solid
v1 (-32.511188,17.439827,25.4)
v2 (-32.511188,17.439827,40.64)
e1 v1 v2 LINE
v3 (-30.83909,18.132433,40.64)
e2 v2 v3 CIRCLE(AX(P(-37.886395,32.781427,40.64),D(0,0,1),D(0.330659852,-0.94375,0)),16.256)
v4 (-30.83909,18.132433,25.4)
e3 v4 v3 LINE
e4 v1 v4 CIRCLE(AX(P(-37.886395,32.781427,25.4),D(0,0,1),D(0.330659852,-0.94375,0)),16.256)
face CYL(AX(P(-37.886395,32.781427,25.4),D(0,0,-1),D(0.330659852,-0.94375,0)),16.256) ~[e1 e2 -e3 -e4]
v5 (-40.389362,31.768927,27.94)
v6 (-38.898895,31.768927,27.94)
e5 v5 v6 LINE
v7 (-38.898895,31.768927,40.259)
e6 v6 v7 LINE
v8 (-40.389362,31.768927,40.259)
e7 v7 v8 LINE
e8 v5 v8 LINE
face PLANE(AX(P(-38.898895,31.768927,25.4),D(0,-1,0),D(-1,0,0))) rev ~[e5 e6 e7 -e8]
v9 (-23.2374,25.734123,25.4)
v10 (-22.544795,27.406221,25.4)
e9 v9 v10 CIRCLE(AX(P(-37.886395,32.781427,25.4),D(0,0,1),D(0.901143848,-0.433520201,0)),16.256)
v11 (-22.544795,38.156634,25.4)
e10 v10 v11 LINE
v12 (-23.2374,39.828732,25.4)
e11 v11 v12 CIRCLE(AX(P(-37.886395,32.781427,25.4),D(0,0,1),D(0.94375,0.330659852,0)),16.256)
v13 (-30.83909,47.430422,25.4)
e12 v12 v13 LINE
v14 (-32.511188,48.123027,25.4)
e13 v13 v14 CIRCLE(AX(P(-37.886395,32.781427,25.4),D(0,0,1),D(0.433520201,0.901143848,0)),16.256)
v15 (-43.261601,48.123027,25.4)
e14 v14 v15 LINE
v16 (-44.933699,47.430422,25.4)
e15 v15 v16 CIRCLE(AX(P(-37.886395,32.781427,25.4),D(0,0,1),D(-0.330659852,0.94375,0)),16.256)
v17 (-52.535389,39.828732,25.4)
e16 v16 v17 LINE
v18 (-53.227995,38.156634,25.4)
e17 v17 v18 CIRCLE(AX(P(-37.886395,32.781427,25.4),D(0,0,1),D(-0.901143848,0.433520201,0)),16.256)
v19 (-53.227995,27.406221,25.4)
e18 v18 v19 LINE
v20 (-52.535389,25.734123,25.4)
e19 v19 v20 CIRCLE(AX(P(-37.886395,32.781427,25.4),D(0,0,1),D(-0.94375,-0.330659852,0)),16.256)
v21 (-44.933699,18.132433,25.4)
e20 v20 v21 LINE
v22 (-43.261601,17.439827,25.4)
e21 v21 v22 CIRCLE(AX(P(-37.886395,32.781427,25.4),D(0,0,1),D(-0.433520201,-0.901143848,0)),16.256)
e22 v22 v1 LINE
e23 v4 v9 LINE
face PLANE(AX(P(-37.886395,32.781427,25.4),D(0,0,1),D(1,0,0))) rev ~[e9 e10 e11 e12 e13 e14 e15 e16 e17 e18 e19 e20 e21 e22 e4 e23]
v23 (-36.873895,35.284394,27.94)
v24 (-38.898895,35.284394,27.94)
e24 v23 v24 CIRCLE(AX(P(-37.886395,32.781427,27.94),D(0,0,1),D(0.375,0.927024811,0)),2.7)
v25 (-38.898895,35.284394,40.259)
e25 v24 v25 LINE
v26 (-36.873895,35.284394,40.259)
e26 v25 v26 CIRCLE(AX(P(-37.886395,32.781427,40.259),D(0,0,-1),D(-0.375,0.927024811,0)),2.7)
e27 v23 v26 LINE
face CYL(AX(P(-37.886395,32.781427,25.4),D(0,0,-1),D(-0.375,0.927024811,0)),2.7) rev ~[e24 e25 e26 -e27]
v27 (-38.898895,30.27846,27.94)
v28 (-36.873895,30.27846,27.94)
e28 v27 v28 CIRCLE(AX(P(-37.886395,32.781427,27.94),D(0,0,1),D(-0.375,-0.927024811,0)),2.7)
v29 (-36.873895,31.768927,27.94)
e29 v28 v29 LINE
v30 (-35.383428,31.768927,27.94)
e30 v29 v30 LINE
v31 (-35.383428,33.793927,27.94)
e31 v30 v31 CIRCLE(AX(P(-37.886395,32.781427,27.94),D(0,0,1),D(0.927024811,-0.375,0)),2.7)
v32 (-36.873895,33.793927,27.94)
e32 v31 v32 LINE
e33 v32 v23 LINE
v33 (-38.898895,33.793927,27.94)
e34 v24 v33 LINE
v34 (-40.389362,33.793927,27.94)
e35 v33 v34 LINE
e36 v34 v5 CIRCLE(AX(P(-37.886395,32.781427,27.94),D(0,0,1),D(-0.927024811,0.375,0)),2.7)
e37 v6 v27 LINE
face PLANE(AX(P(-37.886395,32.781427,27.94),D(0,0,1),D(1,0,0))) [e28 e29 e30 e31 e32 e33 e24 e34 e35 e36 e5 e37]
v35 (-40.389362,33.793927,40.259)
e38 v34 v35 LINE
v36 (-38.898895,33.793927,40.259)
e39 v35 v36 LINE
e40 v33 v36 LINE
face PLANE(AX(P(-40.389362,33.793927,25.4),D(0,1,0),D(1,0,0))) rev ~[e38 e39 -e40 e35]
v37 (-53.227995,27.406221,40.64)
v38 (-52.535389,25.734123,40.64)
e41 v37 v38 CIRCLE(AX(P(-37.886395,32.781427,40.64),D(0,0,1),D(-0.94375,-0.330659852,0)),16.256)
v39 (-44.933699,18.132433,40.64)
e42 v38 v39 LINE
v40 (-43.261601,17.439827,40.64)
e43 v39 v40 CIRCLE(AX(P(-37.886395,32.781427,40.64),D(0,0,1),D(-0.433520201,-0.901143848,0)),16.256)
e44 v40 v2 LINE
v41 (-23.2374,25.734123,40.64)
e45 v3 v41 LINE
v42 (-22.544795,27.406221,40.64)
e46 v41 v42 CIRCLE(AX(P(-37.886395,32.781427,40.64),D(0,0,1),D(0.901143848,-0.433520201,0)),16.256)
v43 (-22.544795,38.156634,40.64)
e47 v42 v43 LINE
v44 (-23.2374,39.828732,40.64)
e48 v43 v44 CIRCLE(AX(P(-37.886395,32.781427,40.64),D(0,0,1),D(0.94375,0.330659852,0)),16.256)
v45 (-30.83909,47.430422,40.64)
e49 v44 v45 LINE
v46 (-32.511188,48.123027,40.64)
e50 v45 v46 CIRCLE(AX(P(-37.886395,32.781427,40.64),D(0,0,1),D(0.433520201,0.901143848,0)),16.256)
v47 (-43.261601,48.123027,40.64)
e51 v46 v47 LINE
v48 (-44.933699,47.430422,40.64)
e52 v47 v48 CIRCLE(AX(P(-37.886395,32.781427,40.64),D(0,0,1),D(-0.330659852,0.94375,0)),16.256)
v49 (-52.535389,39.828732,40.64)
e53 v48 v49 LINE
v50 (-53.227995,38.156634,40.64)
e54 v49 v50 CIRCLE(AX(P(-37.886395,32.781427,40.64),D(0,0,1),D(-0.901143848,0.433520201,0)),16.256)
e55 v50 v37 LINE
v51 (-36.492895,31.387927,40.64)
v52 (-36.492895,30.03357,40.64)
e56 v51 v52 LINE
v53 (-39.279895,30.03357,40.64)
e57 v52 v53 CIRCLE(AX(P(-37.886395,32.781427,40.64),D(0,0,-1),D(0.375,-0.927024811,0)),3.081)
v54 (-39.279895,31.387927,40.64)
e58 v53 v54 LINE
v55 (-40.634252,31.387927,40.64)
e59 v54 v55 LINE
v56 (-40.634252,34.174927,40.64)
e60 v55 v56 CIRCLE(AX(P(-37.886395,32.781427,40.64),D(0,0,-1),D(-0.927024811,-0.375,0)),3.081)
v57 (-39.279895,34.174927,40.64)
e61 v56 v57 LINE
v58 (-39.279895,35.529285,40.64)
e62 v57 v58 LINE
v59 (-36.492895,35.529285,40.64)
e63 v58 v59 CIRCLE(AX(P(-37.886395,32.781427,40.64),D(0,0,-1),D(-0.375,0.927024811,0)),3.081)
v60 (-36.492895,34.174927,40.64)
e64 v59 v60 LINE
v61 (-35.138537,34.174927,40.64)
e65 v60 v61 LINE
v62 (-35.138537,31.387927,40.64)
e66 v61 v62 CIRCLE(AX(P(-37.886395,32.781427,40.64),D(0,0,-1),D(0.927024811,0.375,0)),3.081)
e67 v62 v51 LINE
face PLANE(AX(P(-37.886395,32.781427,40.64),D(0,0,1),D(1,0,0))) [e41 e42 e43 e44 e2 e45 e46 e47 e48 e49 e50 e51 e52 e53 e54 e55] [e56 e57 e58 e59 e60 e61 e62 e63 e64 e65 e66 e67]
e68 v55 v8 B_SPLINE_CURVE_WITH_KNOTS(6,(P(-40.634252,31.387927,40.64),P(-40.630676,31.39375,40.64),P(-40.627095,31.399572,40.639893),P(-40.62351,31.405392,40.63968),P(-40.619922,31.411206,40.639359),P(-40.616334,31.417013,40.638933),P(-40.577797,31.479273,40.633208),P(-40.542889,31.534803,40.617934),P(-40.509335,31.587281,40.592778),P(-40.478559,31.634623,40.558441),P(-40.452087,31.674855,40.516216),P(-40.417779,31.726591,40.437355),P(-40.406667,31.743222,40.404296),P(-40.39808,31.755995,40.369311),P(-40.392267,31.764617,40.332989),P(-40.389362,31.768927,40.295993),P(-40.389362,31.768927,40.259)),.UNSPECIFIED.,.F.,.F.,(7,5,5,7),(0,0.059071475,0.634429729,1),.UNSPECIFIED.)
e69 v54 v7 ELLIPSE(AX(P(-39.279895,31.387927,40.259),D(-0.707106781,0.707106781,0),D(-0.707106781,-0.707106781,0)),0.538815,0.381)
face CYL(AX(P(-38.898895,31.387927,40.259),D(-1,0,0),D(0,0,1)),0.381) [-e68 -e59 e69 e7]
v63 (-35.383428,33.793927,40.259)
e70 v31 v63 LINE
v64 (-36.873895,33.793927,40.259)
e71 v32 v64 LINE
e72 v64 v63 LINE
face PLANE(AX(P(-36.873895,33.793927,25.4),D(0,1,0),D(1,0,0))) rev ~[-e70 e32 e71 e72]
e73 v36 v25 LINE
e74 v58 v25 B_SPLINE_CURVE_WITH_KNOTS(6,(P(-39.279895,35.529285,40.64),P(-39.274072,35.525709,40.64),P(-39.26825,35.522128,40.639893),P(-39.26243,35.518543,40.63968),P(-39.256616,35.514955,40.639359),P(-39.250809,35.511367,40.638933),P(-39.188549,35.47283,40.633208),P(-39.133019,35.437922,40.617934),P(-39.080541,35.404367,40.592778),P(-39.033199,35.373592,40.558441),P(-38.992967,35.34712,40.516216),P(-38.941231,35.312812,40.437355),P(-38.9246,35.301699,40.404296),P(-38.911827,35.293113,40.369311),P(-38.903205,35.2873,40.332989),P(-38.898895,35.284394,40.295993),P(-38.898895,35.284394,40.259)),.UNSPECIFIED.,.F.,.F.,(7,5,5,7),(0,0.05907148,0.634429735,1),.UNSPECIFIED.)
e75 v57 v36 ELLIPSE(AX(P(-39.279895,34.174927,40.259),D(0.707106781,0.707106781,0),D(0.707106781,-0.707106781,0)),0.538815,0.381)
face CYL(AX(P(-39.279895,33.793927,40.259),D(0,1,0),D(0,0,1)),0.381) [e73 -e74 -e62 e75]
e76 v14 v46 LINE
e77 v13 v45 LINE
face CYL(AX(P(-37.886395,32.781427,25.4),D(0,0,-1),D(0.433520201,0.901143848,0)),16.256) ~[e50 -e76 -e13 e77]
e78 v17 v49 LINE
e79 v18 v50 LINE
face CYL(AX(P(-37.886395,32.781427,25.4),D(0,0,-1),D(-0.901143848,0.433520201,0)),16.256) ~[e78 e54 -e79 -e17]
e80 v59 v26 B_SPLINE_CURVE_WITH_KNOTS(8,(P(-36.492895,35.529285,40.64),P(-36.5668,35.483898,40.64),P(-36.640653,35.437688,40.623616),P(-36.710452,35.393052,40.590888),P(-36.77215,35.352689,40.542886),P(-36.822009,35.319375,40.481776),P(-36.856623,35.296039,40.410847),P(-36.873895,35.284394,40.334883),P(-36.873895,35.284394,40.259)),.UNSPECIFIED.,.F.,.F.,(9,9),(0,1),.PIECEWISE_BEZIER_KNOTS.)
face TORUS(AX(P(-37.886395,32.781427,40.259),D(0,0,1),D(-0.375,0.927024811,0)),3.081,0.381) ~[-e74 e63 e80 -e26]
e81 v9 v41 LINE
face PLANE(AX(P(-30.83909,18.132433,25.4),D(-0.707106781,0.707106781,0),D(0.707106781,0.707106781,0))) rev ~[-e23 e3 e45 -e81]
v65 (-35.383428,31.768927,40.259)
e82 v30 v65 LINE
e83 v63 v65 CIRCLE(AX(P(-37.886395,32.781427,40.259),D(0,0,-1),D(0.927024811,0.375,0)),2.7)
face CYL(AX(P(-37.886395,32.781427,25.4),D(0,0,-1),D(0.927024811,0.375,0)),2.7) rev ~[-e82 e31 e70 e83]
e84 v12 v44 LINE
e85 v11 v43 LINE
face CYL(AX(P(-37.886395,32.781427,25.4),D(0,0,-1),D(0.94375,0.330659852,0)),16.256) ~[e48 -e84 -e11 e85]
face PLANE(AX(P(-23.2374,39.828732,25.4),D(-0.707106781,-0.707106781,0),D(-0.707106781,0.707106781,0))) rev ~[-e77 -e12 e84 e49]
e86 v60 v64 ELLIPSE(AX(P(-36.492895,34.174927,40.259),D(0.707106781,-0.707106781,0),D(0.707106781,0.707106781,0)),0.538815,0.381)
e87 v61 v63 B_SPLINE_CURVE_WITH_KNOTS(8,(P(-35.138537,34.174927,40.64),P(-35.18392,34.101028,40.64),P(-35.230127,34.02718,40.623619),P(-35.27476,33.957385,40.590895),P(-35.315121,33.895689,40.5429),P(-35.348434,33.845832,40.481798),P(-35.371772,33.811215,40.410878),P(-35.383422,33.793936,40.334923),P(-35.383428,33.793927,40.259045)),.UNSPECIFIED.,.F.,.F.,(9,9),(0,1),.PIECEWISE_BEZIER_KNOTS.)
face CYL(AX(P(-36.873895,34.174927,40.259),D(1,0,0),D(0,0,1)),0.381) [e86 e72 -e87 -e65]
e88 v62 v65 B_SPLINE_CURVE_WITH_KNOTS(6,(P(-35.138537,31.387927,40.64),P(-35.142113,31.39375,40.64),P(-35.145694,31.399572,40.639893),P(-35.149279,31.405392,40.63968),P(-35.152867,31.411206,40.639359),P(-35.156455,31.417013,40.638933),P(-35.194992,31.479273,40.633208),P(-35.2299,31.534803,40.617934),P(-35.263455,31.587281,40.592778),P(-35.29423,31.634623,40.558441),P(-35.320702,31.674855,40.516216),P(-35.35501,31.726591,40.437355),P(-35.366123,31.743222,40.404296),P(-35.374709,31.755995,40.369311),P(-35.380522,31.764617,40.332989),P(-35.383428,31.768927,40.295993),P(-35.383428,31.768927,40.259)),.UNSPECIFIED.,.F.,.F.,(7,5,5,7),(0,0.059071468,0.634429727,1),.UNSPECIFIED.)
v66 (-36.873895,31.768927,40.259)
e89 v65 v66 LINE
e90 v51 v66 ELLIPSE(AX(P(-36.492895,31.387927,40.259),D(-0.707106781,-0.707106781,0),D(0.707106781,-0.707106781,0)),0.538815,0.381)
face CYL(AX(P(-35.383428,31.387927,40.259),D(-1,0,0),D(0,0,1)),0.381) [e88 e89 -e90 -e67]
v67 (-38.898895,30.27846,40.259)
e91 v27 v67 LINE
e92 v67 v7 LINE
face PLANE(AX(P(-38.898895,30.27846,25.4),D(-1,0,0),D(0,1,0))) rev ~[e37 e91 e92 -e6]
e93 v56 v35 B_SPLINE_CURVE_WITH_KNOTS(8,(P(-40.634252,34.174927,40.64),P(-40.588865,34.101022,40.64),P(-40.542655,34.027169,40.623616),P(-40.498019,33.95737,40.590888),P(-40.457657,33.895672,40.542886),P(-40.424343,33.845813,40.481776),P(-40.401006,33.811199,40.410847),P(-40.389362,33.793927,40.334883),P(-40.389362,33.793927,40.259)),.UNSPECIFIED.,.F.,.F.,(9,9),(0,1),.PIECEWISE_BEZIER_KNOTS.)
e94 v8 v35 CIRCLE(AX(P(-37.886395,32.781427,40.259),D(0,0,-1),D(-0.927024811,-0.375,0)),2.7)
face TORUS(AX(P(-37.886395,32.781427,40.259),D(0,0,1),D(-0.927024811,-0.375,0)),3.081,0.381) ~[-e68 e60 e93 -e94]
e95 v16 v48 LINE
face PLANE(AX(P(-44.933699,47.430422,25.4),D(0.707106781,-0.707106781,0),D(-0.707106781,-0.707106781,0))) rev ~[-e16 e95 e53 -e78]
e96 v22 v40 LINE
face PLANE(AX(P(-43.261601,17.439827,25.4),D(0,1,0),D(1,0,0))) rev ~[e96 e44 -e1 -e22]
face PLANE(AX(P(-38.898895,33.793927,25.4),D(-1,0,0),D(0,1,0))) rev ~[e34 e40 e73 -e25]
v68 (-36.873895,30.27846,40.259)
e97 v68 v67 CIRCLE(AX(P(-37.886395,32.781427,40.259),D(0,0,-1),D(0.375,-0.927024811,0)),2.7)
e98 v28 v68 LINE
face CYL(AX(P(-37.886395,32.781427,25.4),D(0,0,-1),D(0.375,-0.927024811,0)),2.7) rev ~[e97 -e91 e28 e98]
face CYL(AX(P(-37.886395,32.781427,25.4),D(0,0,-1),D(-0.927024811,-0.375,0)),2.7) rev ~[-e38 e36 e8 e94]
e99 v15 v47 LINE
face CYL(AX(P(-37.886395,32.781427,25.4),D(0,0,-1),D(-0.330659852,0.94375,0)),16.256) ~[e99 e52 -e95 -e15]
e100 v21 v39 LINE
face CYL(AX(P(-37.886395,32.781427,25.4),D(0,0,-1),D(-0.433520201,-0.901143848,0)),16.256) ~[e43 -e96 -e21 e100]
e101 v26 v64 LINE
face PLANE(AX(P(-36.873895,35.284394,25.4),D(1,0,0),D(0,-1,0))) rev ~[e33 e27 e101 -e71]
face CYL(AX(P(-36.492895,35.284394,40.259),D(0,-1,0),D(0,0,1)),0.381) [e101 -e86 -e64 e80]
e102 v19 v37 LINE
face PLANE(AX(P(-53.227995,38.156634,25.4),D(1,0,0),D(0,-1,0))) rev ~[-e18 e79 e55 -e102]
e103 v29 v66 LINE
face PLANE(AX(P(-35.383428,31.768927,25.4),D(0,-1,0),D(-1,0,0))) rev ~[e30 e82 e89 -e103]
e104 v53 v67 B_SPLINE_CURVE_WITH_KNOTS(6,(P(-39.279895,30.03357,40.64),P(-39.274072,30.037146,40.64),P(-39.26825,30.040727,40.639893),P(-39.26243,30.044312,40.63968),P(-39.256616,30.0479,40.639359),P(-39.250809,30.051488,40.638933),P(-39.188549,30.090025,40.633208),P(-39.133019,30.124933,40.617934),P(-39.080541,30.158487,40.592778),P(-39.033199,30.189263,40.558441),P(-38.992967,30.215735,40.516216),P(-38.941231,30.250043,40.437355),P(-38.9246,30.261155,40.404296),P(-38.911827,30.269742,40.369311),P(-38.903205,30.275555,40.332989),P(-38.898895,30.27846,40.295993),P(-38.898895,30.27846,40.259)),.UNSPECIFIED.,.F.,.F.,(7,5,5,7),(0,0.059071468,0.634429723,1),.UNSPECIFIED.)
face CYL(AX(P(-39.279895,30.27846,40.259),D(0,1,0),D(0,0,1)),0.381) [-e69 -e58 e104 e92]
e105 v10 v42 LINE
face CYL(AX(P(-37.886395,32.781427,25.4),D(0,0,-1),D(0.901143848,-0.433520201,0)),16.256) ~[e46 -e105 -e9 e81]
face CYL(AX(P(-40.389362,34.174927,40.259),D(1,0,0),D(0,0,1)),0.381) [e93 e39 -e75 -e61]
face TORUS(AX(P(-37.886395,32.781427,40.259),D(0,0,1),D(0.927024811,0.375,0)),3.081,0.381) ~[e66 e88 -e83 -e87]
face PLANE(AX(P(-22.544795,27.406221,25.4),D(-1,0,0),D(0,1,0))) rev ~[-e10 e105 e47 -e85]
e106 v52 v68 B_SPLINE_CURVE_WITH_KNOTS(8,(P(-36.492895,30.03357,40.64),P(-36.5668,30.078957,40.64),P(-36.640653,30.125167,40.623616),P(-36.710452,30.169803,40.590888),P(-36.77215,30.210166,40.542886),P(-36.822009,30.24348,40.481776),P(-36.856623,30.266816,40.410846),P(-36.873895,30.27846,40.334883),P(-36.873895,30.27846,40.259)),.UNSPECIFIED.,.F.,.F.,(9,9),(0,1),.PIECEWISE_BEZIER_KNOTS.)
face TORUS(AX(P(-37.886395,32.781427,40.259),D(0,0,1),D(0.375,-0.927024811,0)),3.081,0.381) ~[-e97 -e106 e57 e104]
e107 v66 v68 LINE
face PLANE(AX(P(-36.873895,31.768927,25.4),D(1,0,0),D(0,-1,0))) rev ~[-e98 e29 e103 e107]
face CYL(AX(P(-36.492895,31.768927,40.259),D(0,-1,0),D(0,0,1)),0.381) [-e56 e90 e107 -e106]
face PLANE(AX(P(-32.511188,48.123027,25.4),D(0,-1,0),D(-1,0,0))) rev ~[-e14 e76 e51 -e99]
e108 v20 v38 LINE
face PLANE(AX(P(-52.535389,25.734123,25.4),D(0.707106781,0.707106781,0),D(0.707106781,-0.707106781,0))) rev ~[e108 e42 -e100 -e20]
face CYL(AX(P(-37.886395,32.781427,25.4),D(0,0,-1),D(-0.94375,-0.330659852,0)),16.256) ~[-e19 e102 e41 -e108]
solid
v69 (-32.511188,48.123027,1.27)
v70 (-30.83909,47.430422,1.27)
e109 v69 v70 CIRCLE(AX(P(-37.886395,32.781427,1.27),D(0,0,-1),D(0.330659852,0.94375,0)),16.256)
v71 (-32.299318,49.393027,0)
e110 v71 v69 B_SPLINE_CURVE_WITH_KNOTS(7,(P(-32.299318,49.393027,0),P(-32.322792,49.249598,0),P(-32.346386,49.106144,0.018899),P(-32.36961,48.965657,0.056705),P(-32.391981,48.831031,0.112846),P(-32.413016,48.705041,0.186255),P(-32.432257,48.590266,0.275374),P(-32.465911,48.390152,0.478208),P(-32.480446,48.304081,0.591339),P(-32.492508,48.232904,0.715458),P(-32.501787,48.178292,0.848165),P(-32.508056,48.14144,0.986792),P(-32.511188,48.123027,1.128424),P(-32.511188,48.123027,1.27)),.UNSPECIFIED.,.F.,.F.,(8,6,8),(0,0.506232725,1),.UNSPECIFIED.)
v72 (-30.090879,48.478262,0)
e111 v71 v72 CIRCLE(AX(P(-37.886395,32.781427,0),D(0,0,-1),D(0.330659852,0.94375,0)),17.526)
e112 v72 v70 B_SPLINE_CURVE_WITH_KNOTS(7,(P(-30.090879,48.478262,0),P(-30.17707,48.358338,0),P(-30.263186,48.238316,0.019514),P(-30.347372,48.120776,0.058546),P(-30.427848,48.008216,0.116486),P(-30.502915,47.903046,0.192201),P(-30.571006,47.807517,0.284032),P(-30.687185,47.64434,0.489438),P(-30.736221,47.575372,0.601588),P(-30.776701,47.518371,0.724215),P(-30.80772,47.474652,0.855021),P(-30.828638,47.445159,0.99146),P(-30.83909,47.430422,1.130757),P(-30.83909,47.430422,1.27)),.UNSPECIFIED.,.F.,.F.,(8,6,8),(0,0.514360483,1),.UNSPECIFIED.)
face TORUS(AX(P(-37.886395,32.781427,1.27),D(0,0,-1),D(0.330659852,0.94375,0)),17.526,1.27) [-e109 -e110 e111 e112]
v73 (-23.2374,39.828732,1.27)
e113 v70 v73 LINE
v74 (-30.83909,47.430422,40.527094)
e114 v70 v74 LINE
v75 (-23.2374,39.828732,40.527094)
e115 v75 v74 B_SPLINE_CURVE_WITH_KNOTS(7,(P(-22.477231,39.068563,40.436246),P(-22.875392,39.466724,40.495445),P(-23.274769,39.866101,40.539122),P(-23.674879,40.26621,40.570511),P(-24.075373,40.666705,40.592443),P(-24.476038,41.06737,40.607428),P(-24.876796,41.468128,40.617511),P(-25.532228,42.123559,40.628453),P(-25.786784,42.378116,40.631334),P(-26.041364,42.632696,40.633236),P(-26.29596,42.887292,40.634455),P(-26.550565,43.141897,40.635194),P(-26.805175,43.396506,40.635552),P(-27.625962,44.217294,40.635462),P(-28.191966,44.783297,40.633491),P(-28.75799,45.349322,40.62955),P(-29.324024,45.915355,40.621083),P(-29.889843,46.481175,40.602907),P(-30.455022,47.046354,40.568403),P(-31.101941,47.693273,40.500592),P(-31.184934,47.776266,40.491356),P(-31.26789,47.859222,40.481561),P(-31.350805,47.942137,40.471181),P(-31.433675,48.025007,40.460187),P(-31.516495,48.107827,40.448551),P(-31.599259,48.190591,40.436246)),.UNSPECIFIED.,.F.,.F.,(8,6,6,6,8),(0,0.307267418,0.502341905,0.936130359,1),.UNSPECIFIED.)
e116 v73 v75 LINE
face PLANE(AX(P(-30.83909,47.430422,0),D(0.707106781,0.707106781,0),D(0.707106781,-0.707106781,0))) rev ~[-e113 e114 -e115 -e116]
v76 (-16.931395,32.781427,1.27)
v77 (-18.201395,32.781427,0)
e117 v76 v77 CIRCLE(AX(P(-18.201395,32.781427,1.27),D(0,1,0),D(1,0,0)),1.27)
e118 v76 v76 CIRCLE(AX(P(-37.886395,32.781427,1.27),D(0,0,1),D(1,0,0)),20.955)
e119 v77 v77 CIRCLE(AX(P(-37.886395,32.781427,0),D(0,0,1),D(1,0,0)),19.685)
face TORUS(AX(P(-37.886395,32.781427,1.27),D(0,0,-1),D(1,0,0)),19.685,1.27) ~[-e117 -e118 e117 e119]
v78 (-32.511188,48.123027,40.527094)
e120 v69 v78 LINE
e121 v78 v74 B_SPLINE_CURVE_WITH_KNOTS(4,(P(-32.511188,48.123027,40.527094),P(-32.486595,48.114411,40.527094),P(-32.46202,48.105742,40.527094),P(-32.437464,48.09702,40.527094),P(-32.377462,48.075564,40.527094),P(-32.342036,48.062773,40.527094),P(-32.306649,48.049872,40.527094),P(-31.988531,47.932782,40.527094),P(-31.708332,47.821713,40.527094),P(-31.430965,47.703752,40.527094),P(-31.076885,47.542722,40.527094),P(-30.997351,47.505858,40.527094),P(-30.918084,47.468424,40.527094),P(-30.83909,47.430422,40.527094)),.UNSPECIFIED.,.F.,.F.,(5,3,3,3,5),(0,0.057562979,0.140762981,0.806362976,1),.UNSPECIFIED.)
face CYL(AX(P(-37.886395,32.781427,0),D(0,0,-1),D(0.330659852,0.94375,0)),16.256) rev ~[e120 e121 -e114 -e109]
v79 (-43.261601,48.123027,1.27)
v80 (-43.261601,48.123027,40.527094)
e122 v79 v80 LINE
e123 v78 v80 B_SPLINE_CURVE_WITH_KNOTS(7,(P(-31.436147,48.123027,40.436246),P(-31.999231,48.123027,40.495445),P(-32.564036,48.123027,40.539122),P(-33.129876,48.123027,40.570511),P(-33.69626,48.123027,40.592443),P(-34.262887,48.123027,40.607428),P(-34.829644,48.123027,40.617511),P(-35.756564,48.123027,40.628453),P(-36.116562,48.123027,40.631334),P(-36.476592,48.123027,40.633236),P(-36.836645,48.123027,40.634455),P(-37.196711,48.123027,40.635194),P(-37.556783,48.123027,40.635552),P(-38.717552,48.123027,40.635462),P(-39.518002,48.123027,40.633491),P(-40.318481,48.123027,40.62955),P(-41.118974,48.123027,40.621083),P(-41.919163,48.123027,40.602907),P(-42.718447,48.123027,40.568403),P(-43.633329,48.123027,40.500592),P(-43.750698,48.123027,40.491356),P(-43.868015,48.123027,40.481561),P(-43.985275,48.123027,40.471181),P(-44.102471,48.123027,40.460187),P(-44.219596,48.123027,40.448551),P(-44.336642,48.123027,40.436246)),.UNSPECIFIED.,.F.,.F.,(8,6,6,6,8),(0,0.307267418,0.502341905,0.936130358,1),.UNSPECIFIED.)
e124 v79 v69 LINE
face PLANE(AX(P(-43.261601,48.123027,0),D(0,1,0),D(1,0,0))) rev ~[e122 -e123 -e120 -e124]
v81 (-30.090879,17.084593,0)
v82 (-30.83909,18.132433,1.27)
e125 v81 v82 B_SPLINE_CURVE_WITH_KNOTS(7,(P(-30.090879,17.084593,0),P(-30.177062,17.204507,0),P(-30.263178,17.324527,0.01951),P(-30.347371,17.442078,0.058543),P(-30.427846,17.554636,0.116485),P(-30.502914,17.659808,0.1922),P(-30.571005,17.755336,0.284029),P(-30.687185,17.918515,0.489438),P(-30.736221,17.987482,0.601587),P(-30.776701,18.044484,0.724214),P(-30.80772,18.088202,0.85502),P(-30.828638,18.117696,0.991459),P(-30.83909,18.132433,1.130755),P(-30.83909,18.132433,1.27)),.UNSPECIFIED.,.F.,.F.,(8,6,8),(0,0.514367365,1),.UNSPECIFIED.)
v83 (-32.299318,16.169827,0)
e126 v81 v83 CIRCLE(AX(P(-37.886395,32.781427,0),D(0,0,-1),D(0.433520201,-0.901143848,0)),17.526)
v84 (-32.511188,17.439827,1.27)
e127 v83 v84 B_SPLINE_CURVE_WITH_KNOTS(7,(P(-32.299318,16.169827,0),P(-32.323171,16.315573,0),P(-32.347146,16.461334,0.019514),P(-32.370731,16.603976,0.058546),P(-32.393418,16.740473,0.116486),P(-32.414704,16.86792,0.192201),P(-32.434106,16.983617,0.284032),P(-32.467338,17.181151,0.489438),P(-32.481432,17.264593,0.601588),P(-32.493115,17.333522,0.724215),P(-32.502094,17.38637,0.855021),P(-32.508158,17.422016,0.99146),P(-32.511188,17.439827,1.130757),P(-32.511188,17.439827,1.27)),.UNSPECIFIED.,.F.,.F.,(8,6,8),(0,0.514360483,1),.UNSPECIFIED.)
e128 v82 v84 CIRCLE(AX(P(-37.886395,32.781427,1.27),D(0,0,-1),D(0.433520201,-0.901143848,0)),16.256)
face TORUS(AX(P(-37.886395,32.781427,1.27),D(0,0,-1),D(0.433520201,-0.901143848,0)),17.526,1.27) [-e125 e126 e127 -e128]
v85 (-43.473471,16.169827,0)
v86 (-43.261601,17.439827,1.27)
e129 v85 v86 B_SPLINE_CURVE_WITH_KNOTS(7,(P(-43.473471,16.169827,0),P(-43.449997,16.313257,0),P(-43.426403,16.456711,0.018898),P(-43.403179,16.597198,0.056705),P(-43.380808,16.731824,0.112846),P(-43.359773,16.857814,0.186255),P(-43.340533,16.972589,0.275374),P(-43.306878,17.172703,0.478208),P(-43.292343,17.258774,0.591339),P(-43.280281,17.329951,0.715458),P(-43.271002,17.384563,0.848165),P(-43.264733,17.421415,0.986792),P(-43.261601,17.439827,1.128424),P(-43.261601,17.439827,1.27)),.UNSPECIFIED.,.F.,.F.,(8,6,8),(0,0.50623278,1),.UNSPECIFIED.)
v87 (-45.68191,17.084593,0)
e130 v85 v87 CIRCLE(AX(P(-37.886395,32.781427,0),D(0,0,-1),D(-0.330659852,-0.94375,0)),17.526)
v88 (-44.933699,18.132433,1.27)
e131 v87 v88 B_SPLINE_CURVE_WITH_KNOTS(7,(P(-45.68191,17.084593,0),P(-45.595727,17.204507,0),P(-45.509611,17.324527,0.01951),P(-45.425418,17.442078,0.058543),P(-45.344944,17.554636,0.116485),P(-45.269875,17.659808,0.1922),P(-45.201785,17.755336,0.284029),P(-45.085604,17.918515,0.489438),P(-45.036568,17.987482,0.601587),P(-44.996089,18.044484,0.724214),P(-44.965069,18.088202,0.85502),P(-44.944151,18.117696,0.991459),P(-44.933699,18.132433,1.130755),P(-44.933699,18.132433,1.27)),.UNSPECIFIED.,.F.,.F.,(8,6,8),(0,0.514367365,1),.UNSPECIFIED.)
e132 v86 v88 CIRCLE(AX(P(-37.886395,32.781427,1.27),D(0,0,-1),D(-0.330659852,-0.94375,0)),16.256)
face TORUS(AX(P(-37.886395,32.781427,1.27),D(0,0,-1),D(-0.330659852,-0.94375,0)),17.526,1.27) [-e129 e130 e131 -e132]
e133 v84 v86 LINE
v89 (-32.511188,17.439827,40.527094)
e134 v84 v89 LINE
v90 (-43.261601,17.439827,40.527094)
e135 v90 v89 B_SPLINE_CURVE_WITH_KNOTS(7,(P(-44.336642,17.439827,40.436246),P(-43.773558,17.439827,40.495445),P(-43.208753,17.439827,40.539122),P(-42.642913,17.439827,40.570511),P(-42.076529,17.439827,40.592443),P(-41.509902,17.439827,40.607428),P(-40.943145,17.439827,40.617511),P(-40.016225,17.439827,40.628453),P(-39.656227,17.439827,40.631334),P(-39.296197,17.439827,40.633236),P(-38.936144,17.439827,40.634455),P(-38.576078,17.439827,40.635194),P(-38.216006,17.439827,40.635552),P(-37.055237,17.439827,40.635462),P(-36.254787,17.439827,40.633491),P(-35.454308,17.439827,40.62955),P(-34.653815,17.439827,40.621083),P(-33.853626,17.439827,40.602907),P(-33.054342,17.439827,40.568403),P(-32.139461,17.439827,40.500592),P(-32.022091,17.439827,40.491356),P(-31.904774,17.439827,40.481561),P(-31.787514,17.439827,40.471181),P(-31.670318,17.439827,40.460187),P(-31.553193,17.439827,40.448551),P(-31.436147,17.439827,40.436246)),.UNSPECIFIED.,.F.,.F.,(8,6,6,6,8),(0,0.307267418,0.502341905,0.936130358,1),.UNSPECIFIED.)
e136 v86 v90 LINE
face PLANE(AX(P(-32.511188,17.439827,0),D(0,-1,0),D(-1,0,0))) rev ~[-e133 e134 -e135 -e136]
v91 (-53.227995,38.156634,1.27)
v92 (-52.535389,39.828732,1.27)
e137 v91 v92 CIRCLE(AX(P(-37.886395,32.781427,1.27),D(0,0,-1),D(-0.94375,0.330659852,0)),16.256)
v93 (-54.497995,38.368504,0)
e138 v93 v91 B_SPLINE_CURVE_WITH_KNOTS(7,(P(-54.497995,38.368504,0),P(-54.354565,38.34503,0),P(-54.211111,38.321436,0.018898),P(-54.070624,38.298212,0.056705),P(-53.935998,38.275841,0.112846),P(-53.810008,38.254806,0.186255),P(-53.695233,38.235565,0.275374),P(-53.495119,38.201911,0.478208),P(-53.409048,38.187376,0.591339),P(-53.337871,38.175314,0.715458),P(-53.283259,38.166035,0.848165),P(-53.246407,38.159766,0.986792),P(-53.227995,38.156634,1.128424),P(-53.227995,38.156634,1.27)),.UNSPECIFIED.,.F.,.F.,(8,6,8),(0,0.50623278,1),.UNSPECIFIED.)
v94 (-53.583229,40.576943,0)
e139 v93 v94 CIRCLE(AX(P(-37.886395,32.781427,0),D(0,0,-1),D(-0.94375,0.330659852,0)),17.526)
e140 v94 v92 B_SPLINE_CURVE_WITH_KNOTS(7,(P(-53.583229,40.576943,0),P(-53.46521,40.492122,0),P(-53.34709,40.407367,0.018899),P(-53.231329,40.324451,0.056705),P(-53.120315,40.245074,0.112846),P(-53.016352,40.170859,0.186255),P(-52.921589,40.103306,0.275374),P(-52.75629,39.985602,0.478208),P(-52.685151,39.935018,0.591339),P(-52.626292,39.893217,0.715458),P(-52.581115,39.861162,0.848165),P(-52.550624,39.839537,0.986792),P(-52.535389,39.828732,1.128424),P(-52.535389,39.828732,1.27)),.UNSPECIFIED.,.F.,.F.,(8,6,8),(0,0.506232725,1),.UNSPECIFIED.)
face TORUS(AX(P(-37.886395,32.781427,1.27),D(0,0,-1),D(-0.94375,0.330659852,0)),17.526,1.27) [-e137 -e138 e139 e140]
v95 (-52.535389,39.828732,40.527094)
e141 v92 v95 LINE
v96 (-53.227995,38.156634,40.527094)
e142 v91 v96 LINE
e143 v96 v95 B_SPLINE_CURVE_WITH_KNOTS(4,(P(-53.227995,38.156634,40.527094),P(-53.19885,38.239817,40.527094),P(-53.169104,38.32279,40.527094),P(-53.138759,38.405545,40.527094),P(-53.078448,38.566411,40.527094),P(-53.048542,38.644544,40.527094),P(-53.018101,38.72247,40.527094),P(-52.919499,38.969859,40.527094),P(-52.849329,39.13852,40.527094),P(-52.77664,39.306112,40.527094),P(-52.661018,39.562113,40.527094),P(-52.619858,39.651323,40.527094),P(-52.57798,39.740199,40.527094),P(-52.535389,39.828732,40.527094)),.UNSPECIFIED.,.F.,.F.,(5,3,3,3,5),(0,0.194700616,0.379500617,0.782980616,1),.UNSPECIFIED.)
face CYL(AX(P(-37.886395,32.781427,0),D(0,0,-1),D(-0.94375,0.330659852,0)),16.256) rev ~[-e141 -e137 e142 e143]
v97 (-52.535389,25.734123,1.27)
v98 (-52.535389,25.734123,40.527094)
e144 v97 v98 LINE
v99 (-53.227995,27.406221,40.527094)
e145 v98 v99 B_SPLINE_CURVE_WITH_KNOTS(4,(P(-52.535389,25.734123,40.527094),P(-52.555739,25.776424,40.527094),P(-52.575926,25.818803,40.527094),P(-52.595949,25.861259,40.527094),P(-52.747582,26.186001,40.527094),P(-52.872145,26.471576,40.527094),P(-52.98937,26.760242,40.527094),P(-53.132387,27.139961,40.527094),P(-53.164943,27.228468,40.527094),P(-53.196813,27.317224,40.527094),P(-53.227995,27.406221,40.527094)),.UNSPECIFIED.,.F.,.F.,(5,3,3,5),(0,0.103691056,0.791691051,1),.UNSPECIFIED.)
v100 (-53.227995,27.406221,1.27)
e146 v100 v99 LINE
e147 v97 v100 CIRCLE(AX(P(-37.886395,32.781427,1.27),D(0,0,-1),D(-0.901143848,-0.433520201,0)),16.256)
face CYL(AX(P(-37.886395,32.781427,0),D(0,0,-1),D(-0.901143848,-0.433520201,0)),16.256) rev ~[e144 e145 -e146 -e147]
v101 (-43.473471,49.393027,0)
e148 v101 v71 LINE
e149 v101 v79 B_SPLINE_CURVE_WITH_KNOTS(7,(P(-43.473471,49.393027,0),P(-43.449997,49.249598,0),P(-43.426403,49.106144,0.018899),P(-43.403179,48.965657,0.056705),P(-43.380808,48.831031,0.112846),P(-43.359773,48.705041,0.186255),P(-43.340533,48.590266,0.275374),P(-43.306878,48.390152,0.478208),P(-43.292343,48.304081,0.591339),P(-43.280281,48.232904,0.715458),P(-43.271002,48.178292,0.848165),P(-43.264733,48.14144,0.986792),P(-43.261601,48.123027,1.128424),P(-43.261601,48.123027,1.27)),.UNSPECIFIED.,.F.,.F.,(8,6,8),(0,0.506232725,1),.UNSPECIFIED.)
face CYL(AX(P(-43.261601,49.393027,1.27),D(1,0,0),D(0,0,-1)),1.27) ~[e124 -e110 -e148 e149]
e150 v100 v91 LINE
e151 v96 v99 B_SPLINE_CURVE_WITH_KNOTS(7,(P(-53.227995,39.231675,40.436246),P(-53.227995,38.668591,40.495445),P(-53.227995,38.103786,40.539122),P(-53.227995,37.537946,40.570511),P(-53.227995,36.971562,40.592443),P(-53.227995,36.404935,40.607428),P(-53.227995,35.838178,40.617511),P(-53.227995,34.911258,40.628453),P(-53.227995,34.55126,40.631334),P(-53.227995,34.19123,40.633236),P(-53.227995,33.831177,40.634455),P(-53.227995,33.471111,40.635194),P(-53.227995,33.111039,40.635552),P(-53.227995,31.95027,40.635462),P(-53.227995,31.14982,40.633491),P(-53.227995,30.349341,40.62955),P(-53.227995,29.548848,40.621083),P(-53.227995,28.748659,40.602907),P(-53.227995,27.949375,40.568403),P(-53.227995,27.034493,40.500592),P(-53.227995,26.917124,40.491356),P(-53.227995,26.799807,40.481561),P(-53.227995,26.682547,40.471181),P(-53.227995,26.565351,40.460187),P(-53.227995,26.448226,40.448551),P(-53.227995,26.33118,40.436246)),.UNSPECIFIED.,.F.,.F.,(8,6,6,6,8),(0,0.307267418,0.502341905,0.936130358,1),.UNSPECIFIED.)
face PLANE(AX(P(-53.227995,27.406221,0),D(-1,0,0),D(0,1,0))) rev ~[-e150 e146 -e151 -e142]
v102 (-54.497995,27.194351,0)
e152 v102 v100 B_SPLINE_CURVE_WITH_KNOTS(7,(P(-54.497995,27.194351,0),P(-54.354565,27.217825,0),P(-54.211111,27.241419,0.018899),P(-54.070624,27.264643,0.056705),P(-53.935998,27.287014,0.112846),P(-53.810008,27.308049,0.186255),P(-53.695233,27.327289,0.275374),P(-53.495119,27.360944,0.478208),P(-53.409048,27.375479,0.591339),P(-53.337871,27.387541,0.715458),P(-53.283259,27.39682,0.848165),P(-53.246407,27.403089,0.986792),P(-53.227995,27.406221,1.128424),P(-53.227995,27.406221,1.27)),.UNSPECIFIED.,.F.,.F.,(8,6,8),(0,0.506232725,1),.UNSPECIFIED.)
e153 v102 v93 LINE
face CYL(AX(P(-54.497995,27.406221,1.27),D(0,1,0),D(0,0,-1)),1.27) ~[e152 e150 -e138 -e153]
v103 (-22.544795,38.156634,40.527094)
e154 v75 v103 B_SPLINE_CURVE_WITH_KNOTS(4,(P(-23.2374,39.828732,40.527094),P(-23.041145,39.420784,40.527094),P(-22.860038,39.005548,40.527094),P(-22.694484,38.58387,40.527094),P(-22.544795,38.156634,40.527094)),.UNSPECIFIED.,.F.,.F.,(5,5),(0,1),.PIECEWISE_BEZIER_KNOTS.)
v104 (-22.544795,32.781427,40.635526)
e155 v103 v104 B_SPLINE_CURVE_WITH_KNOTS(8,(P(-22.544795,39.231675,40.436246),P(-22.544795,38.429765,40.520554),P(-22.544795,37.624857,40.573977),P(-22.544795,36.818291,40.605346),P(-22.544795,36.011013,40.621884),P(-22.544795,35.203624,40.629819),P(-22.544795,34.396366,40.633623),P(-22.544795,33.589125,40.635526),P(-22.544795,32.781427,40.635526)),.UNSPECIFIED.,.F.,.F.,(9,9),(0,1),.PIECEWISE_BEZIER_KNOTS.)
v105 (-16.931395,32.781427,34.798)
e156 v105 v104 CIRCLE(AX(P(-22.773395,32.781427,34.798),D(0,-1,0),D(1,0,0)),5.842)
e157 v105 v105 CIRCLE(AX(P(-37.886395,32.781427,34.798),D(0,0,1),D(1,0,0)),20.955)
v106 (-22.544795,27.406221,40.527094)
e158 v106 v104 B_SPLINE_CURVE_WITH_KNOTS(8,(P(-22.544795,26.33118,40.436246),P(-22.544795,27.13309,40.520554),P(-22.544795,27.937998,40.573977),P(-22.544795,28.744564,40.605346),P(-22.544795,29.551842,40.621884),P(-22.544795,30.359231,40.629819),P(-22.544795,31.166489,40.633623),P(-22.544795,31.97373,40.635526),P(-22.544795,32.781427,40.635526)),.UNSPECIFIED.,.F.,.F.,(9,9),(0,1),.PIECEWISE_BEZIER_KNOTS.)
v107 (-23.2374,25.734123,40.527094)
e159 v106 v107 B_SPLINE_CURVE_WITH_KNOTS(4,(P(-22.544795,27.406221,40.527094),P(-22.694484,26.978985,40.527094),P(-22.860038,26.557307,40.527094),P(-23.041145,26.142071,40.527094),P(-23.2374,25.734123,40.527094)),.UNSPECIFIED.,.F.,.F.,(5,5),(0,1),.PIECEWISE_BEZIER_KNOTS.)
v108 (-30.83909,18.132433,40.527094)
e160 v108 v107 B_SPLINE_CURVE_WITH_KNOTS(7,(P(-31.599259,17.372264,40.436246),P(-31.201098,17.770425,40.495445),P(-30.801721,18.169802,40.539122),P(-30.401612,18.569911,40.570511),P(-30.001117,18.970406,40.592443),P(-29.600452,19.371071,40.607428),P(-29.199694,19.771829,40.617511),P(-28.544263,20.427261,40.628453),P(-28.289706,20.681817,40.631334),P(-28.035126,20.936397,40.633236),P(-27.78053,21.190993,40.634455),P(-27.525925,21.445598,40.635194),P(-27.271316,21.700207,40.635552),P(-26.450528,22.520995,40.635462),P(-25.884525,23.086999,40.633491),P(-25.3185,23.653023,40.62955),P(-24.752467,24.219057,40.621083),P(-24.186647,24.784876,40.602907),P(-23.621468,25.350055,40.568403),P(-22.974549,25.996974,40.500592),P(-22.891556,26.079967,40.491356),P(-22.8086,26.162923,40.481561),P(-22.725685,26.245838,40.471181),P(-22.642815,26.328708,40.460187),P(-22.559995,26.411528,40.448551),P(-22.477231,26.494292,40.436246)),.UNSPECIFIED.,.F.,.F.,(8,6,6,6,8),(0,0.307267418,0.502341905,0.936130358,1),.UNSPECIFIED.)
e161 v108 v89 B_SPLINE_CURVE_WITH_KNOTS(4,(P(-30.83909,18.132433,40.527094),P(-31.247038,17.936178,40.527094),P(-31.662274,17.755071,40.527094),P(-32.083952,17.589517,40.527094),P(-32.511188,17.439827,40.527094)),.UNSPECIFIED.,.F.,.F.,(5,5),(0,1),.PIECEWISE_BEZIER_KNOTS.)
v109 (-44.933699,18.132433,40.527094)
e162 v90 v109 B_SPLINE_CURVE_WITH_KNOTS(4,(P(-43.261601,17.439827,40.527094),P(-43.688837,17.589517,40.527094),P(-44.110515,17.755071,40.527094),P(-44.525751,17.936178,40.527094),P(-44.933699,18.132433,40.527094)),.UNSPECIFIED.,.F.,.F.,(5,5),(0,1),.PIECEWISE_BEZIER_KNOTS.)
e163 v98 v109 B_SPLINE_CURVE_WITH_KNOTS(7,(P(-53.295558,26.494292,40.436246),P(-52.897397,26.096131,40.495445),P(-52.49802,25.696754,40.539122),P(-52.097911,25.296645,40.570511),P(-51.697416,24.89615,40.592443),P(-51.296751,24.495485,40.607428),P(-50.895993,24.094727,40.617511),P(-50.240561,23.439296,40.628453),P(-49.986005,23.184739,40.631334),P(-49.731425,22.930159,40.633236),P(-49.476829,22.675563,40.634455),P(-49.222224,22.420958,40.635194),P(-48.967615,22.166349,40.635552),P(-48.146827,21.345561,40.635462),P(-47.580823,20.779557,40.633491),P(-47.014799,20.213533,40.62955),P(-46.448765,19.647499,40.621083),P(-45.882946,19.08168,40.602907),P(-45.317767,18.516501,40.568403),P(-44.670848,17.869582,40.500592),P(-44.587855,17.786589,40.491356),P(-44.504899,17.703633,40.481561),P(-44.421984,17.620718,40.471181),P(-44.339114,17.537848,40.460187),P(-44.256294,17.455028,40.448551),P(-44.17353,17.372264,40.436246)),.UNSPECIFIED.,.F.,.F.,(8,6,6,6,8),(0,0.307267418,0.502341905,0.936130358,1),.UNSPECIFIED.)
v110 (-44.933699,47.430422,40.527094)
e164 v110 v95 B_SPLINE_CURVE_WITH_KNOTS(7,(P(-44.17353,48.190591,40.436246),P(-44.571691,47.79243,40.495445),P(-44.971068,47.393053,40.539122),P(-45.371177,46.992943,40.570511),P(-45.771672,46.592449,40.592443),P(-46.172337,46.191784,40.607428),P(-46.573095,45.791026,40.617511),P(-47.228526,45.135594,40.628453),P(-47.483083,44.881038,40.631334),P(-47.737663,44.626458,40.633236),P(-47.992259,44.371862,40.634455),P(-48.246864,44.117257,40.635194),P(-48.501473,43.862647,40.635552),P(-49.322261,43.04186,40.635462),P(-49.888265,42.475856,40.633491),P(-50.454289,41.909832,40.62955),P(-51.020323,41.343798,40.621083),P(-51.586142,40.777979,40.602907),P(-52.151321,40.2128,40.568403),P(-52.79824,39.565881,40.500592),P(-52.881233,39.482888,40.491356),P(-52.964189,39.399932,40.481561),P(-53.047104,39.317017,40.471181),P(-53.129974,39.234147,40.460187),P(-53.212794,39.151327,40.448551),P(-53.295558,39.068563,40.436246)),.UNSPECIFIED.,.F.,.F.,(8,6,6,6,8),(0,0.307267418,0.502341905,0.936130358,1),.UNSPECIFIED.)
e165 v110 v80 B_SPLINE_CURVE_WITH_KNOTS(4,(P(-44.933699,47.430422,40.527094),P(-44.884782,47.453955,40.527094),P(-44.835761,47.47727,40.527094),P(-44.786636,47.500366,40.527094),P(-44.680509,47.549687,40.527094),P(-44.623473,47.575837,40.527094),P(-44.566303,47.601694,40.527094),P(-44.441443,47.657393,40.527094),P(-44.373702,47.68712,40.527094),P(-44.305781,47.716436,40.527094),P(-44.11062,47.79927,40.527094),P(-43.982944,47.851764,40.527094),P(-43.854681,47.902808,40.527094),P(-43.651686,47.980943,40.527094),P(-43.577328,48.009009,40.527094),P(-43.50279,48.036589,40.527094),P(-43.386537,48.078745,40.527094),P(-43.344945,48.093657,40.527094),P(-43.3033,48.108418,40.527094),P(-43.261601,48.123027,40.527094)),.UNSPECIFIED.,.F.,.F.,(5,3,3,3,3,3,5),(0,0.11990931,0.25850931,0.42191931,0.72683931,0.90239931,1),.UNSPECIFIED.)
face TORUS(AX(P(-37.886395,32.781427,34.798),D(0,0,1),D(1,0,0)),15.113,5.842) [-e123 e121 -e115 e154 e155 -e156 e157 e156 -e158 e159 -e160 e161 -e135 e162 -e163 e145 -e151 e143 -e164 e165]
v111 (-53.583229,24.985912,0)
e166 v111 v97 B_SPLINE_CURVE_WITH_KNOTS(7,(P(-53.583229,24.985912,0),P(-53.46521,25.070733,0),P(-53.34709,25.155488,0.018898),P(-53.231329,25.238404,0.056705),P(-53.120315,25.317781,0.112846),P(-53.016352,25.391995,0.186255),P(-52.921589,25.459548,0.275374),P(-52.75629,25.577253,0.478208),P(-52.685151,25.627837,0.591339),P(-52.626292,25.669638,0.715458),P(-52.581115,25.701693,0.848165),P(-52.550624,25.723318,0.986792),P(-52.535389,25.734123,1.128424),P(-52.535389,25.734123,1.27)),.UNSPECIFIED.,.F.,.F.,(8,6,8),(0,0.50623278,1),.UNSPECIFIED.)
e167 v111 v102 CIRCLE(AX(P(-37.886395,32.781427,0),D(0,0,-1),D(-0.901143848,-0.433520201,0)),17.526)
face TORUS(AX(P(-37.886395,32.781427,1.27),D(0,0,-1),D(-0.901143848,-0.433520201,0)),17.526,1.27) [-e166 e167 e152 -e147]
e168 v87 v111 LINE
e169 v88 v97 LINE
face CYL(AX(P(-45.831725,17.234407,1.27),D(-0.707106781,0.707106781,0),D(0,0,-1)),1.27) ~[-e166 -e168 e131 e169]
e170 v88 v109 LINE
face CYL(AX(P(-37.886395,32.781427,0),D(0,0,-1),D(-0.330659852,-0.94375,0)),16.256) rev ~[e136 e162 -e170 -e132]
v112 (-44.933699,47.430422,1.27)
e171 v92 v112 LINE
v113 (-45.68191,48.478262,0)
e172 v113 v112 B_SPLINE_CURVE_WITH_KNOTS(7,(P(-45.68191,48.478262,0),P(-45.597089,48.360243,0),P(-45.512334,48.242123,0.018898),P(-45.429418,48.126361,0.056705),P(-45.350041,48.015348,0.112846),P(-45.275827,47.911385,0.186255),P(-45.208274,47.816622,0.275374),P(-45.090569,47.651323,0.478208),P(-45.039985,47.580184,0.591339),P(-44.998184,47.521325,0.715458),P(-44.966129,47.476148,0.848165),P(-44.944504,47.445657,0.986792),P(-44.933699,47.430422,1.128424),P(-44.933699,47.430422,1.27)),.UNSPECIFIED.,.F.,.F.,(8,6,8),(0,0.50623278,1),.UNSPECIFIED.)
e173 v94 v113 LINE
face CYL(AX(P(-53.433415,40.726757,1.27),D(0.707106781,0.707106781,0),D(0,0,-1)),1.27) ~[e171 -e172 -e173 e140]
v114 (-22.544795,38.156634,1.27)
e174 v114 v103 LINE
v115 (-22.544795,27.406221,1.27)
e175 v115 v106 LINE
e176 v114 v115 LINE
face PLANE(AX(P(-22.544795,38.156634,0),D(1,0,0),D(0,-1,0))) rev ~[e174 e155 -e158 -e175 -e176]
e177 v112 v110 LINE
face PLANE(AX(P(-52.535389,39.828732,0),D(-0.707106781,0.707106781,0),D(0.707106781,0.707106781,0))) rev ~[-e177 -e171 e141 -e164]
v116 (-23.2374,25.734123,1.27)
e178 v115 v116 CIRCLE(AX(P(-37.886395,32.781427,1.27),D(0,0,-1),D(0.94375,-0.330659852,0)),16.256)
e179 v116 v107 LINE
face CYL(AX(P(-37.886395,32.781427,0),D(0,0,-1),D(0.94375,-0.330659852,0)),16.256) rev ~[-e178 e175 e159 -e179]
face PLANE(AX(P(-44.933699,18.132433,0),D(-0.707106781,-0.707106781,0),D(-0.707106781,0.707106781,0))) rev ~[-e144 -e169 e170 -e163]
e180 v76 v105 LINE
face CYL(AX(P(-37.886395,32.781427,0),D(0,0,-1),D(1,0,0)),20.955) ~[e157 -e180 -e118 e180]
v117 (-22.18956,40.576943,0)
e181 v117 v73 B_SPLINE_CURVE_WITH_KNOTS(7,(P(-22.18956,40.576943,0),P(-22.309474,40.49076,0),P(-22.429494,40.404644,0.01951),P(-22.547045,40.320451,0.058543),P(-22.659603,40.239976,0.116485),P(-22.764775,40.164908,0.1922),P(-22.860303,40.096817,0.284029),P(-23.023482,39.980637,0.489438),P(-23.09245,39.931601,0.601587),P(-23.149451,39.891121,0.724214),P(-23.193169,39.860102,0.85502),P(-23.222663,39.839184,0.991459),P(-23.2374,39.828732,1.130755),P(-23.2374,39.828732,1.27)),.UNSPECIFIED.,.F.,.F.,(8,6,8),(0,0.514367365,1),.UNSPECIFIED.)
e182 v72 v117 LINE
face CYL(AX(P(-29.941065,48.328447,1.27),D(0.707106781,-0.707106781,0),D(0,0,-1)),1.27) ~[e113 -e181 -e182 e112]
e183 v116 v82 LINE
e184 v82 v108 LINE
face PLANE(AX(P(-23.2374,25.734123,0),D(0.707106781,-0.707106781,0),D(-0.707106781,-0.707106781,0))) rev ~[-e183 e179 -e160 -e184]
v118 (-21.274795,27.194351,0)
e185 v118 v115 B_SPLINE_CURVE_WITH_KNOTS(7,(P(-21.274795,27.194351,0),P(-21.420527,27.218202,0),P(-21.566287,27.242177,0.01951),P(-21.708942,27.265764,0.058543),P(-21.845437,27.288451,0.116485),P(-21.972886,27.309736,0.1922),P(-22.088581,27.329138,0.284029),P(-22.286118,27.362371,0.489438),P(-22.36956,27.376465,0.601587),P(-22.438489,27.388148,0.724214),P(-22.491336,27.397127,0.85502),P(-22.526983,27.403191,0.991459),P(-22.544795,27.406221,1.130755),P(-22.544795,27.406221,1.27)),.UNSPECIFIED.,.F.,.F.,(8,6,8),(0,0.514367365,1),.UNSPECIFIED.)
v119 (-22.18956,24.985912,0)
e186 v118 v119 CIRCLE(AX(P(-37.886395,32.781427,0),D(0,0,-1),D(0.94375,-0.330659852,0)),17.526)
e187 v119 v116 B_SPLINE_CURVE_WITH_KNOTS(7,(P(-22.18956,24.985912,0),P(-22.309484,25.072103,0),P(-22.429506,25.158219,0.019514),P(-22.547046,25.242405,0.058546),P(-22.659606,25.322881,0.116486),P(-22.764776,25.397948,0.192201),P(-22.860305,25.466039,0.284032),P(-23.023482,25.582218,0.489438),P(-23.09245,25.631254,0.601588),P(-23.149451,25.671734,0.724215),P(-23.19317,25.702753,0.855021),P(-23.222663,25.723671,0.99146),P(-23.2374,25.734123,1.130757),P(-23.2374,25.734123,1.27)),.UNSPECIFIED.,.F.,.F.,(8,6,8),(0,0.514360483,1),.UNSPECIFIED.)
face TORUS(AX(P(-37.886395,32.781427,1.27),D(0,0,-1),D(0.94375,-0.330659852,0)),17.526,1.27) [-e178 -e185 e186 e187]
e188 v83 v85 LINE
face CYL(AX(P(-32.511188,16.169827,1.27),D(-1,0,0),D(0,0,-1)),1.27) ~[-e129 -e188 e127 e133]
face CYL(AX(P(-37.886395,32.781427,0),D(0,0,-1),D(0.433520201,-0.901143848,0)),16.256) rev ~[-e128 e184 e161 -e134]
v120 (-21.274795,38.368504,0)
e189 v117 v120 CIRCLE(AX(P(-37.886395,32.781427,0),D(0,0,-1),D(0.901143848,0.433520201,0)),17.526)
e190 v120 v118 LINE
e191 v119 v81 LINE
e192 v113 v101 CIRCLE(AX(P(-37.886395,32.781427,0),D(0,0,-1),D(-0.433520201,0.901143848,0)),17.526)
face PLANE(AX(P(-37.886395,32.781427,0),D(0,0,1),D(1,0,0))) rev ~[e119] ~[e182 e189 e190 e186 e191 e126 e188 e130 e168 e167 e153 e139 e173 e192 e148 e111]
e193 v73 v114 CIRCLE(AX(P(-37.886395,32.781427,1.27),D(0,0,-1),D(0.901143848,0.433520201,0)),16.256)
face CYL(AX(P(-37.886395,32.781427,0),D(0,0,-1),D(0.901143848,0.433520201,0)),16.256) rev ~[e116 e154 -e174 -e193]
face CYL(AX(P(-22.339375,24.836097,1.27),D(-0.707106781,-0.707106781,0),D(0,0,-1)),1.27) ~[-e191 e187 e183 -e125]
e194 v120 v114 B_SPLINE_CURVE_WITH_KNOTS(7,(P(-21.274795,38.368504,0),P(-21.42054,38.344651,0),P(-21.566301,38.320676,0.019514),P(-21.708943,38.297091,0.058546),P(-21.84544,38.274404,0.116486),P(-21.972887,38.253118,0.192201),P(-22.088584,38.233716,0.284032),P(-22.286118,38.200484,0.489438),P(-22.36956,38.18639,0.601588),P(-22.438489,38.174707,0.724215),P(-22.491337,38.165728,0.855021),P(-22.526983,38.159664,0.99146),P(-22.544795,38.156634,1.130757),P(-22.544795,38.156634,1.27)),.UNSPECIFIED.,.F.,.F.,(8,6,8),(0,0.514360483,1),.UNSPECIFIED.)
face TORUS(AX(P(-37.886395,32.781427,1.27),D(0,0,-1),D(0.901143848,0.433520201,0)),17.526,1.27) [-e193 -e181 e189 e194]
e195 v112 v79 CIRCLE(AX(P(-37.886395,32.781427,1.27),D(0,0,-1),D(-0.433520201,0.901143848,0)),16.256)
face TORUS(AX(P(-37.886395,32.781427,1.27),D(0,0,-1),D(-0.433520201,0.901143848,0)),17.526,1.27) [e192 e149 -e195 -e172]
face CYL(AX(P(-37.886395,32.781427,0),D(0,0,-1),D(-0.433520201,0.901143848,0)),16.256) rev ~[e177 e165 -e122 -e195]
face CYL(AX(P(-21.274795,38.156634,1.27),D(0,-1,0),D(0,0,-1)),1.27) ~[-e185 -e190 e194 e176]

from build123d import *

# Parameters (mm, degrees)
F1_START = 25.4
F1_DEPTH = 2.54
F2_START = 25.4
F0_R     = 6.35
F2_DEPTH = 15.24
F3_START = 25.4
F3_DEPTH = 15.24
F0_R_2   = 20.955
F4_DEPTH = 40.64
F5_R     = 0.381
F7_R     = 1.27


# Not quite as in the source:
# - a fillet or chamfer that OpenCascade refuses, or shapes differently, is made with other operations: its cross-section is extruded or revolved along the edge and cut away or added
# - a feature names something its author has since deleted; it is built from what else it names


with BuildPart() as f1:
    # F0 (on Top) → F1 (new body)
    with BuildSketch(Plane.XY.offset(F1_START)):
        with BuildLine():
            Line((-40.3893615403, 31.7689274535), (-38.8988945509, 31.7689274535))
            Line((-38.8988945509, 31.7689274535), (-38.8988945509, 30.2784604641))
            ThreePointArc((-38.8988945509, 30.2784604641), (-37.8863945509, 30.0814274535), (-36.8738945509, 30.2784604641))
            Line((-36.8738945509, 30.2784604641), (-36.8738945509, 31.7689274535))
            Line((-36.8738945509, 31.7689274535), (-35.3834275615, 31.7689274535))
            ThreePointArc((-35.3834275615, 31.7689274535), (-35.1863945509, 32.7814274535), (-35.3834275615, 33.7939274535))
            Line((-35.3834275615, 33.7939274535), (-36.8738945509, 33.7939274535))
            Line((-36.8738945509, 33.7939274535), (-36.8738945509, 35.2843944429))
            ThreePointArc((-36.8738945509, 35.2843944429), (-37.8863945509, 35.4814274535), (-38.8988945509, 35.2843944429))
            Line((-38.8988945509, 35.2843944429), (-38.8988945509, 33.7939274535))
            Line((-38.8988945509, 33.7939274535), (-40.3893615403, 33.7939274535))
            ThreePointArc((-40.3893615403, 33.7939274535), (-40.5863945509, 32.7814274535), (-40.3893615403, 31.7689274535))
        make_face()
    extrude(amount=F1_DEPTH)

    # F0 (on Top) → F2 (join)
    with BuildSketch(Plane.XY.offset(F2_START)):
        with Locations((-37.8863945509, 32.7814274535)):
            Circle(F0_R)
        with BuildLine():
            Line((-38.8988945509, 30.2784604641), (-38.8988945509, 31.7689274535))
            Line((-38.8988945509, 31.7689274535), (-40.3893615403, 31.7689274535))
            ThreePointArc((-40.3893615403, 31.7689274535), (-40.5863945509, 32.7814274535), (-40.3893615403, 33.7939274535))
            Line((-40.3893615403, 33.7939274535), (-38.8988945509, 33.7939274535))
            Line((-38.8988945509, 33.7939274535), (-38.8988945509, 35.2843944429))
            ThreePointArc((-38.8988945509, 35.2843944429), (-37.8863945509, 35.4814274535), (-36.8738945509, 35.2843944429))
            Line((-36.8738945509, 35.2843944429), (-36.8738945509, 33.7939274535))
            Line((-36.8738945509, 33.7939274535), (-35.3834275615, 33.7939274535))
            ThreePointArc((-35.3834275615, 33.7939274535), (-35.1863945509, 32.7814274535), (-35.3834275615, 31.7689274535))
            Line((-35.3834275615, 31.7689274535), (-36.8738945509, 31.7689274535))
            Line((-36.8738945509, 31.7689274535), (-36.8738945509, 30.2784604641))
            ThreePointArc((-36.8738945509, 30.2784604641), (-37.8863945509, 30.0814274535), (-38.8988945509, 30.2784604641))
        make_face(mode=Mode.SUBTRACT)
    extrude(amount=F2_DEPTH)

    # F0 (on Top) → F3 (join)
    with BuildSketch(Plane.XY.offset(F3_START)):
        with BuildLine():
            Line((-22.5447945509, 27.4062209049), (-22.5447945509, 38.1566340021))
            ThreePointArc((-22.5447945509, 38.1566340021), (-22.8678088704, 39.00232933), (-23.2374001559, 39.8287318469))
            Line((-23.2374001559, 39.8287318469), (-30.8390901575, 47.4304218485))
            ThreePointArc((-30.8390901575, 47.4304218485), (-31.6654926744, 47.800013134), (-32.5111880023, 48.1230274535))
            Line((-32.5111880023, 48.1230274535), (-43.2616010995, 48.1230274535))
            ThreePointArc((-43.2616010995, 48.1230274535), (-44.1072964275, 47.800013134), (-44.9336989444, 47.4304218485))
            Line((-44.9336989444, 47.4304218485), (-52.535388946, 39.8287318469))
            ThreePointArc((-52.535388946, 39.8287318469), (-52.9049802314, 39.00232933), (-53.2279945509, 38.1566340021))
            Line((-53.2279945509, 38.1566340021), (-53.2279945509, 27.4062209049))
            ThreePointArc((-53.2279945509, 27.4062209049), (-52.9049802314, 26.5605255769), (-52.535388946, 25.73412306))
            Line((-52.535388946, 25.73412306), (-44.9336989444, 18.1324330584))
            ThreePointArc((-44.9336989444, 18.1324330584), (-44.1072964275, 17.762841773), (-43.2616010995, 17.4398274535))
            Line((-43.2616010995, 17.4398274535), (-32.5111880023, 17.4398274535))
            ThreePointArc((-32.5111880023, 17.4398274535), (-31.6654926744, 17.762841773), (-30.8390901575, 18.1324330584))
            Line((-30.8390901575, 18.1324330584), (-23.2374001559, 25.73412306))
            ThreePointArc((-23.2374001559, 25.73412306), (-22.8678088704, 26.5605255769), (-22.5447945509, 27.4062209049))
        make_face()
        with Locations((-37.8863945509, 32.7814274535)):
            Circle(F0_R, mode=Mode.SUBTRACT)
    extrude(amount=F3_DEPTH)

    # F5
    f5_edges = [f1.edges().sort_by_distance(p)[0] for p in [
        (-36.128661, 33.793927, 40.64),
        (-35.186395, 32.781427, 40.64),
        (-36.873895, 31.023694, 40.64),
        (-36.873895, 34.539161, 40.64),
        (-37.886395, 35.481427, 40.64),
        (-36.128661, 31.768927, 40.64),
        (-39.644128, 33.793927, 40.64),
        (-38.898895, 34.539161, 40.64),
        (-39.644128, 31.768927, 40.64),
        (-40.586395, 32.781427, 40.64),
        (-38.898895, 31.023694, 40.64),
        (-37.886395, 30.081427, 40.64),
    ]]
    fillet(f5_edges, radius=F5_R)


with BuildPart() as f4:
    # F0 (on Top) → F4 (new body)
    with BuildSketch(Plane.XY):
        with Locations((-37.8863945509, 32.7814274535)):
            Circle(F0_R_2)
        with BuildLine():
            ThreePointArc((-23.2374001559, 39.8287318469), (-22.8678088704, 39.00232933), (-22.5447945509, 38.1566340021))
            Line((-22.5447945509, 38.1566340021), (-22.5447945509, 27.4062209049))
            ThreePointArc((-22.5447945509, 27.4062209049), (-22.8678088704, 26.5605255769), (-23.2374001559, 25.73412306))
            Line((-23.2374001559, 25.73412306), (-30.8390901575, 18.1324330584))
            ThreePointArc((-30.8390901575, 18.1324330584), (-31.6654926744, 17.762841773), (-32.5111880023, 17.4398274535))
            Line((-32.5111880023, 17.4398274535), (-43.2616010995, 17.4398274535))
            ThreePointArc((-43.2616010995, 17.4398274535), (-44.1072964275, 17.762841773), (-44.9336989444, 18.1324330584))
            Line((-44.9336989444, 18.1324330584), (-52.535388946, 25.73412306))
            ThreePointArc((-52.535388946, 25.73412306), (-52.9049802314, 26.5605255769), (-53.2279945509, 27.4062209049))
            Line((-53.2279945509, 27.4062209049), (-53.2279945509, 38.1566340021))
            ThreePointArc((-53.2279945509, 38.1566340021), (-52.9049802314, 39.00232933), (-52.535388946, 39.8287318469))
            Line((-52.535388946, 39.8287318469), (-44.9336989444, 47.4304218485))
            ThreePointArc((-44.9336989444, 47.4304218485), (-44.1072964275, 47.800013134), (-43.2616010995, 48.1230274535))
            Line((-43.2616010995, 48.1230274535), (-32.5111880023, 48.1230274535))
            ThreePointArc((-32.5111880023, 48.1230274535), (-31.6654926744, 47.800013134), (-30.8390901575, 47.4304218485))
            Line((-30.8390901575, 47.4304218485), (-23.2374001559, 39.8287318469))
        make_face(mode=Mode.SUBTRACT)
    extrude(amount=F4_DEPTH)

    # F6: fillet of radius 5.842 on 1 edges, made by hand

    # F6_s1 → F6_t2 (revolve, cut)
    with BuildSketch(Plane.XZ.offset(-32.7814274535)):
        with BuildLine():
            ThreePointArc((-16.9313945509, 34.798), (-18.6424767352, 38.9289178157), (-22.7733945509, 40.64))
            Line((-22.7733945509, 40.64), (-16.9313945509, 40.64))
            Line((-16.9313945509, 40.64), (-16.9313945509, 34.798))
        make_face()
    revolve(axis=Axis((-37.8863945509, 32.7814274535, 40.64), (0, 0, 1)), mode=Mode.SUBTRACT)

    # F7
    f7_edges = [f4.edges().sort_by_distance(p)[0] for p in [
        (-58.841395, 32.781427, 0),
        (-37.886395, 17.439827, 0),
        (-48.734544, 21.933278, 0),
        (-44.107296, 17.762842, 0),
        (-31.665493, 17.762842, 0),
        (-27.038245, 21.933278, 0),
        (-22.867809, 26.560526, 0),
        (-22.544795, 32.781427, 0),
        (-22.867809, 39.002329, 0),
        (-27.038245, 43.629577, 0),
        (-52.90498, 26.560526, 0),
        (-53.227995, 32.781427, 0),
        (-52.90498, 39.002329, 0),
        (-48.734544, 43.629577, 0),
        (-44.107296, 47.800013, 0),
        (-37.886395, 48.123027, 0),
        (-31.665493, 47.800013, 0),
    ]]
    fillet(f7_edges, radius=F7_R)


solid = Compound([f1.part, f4.part])
